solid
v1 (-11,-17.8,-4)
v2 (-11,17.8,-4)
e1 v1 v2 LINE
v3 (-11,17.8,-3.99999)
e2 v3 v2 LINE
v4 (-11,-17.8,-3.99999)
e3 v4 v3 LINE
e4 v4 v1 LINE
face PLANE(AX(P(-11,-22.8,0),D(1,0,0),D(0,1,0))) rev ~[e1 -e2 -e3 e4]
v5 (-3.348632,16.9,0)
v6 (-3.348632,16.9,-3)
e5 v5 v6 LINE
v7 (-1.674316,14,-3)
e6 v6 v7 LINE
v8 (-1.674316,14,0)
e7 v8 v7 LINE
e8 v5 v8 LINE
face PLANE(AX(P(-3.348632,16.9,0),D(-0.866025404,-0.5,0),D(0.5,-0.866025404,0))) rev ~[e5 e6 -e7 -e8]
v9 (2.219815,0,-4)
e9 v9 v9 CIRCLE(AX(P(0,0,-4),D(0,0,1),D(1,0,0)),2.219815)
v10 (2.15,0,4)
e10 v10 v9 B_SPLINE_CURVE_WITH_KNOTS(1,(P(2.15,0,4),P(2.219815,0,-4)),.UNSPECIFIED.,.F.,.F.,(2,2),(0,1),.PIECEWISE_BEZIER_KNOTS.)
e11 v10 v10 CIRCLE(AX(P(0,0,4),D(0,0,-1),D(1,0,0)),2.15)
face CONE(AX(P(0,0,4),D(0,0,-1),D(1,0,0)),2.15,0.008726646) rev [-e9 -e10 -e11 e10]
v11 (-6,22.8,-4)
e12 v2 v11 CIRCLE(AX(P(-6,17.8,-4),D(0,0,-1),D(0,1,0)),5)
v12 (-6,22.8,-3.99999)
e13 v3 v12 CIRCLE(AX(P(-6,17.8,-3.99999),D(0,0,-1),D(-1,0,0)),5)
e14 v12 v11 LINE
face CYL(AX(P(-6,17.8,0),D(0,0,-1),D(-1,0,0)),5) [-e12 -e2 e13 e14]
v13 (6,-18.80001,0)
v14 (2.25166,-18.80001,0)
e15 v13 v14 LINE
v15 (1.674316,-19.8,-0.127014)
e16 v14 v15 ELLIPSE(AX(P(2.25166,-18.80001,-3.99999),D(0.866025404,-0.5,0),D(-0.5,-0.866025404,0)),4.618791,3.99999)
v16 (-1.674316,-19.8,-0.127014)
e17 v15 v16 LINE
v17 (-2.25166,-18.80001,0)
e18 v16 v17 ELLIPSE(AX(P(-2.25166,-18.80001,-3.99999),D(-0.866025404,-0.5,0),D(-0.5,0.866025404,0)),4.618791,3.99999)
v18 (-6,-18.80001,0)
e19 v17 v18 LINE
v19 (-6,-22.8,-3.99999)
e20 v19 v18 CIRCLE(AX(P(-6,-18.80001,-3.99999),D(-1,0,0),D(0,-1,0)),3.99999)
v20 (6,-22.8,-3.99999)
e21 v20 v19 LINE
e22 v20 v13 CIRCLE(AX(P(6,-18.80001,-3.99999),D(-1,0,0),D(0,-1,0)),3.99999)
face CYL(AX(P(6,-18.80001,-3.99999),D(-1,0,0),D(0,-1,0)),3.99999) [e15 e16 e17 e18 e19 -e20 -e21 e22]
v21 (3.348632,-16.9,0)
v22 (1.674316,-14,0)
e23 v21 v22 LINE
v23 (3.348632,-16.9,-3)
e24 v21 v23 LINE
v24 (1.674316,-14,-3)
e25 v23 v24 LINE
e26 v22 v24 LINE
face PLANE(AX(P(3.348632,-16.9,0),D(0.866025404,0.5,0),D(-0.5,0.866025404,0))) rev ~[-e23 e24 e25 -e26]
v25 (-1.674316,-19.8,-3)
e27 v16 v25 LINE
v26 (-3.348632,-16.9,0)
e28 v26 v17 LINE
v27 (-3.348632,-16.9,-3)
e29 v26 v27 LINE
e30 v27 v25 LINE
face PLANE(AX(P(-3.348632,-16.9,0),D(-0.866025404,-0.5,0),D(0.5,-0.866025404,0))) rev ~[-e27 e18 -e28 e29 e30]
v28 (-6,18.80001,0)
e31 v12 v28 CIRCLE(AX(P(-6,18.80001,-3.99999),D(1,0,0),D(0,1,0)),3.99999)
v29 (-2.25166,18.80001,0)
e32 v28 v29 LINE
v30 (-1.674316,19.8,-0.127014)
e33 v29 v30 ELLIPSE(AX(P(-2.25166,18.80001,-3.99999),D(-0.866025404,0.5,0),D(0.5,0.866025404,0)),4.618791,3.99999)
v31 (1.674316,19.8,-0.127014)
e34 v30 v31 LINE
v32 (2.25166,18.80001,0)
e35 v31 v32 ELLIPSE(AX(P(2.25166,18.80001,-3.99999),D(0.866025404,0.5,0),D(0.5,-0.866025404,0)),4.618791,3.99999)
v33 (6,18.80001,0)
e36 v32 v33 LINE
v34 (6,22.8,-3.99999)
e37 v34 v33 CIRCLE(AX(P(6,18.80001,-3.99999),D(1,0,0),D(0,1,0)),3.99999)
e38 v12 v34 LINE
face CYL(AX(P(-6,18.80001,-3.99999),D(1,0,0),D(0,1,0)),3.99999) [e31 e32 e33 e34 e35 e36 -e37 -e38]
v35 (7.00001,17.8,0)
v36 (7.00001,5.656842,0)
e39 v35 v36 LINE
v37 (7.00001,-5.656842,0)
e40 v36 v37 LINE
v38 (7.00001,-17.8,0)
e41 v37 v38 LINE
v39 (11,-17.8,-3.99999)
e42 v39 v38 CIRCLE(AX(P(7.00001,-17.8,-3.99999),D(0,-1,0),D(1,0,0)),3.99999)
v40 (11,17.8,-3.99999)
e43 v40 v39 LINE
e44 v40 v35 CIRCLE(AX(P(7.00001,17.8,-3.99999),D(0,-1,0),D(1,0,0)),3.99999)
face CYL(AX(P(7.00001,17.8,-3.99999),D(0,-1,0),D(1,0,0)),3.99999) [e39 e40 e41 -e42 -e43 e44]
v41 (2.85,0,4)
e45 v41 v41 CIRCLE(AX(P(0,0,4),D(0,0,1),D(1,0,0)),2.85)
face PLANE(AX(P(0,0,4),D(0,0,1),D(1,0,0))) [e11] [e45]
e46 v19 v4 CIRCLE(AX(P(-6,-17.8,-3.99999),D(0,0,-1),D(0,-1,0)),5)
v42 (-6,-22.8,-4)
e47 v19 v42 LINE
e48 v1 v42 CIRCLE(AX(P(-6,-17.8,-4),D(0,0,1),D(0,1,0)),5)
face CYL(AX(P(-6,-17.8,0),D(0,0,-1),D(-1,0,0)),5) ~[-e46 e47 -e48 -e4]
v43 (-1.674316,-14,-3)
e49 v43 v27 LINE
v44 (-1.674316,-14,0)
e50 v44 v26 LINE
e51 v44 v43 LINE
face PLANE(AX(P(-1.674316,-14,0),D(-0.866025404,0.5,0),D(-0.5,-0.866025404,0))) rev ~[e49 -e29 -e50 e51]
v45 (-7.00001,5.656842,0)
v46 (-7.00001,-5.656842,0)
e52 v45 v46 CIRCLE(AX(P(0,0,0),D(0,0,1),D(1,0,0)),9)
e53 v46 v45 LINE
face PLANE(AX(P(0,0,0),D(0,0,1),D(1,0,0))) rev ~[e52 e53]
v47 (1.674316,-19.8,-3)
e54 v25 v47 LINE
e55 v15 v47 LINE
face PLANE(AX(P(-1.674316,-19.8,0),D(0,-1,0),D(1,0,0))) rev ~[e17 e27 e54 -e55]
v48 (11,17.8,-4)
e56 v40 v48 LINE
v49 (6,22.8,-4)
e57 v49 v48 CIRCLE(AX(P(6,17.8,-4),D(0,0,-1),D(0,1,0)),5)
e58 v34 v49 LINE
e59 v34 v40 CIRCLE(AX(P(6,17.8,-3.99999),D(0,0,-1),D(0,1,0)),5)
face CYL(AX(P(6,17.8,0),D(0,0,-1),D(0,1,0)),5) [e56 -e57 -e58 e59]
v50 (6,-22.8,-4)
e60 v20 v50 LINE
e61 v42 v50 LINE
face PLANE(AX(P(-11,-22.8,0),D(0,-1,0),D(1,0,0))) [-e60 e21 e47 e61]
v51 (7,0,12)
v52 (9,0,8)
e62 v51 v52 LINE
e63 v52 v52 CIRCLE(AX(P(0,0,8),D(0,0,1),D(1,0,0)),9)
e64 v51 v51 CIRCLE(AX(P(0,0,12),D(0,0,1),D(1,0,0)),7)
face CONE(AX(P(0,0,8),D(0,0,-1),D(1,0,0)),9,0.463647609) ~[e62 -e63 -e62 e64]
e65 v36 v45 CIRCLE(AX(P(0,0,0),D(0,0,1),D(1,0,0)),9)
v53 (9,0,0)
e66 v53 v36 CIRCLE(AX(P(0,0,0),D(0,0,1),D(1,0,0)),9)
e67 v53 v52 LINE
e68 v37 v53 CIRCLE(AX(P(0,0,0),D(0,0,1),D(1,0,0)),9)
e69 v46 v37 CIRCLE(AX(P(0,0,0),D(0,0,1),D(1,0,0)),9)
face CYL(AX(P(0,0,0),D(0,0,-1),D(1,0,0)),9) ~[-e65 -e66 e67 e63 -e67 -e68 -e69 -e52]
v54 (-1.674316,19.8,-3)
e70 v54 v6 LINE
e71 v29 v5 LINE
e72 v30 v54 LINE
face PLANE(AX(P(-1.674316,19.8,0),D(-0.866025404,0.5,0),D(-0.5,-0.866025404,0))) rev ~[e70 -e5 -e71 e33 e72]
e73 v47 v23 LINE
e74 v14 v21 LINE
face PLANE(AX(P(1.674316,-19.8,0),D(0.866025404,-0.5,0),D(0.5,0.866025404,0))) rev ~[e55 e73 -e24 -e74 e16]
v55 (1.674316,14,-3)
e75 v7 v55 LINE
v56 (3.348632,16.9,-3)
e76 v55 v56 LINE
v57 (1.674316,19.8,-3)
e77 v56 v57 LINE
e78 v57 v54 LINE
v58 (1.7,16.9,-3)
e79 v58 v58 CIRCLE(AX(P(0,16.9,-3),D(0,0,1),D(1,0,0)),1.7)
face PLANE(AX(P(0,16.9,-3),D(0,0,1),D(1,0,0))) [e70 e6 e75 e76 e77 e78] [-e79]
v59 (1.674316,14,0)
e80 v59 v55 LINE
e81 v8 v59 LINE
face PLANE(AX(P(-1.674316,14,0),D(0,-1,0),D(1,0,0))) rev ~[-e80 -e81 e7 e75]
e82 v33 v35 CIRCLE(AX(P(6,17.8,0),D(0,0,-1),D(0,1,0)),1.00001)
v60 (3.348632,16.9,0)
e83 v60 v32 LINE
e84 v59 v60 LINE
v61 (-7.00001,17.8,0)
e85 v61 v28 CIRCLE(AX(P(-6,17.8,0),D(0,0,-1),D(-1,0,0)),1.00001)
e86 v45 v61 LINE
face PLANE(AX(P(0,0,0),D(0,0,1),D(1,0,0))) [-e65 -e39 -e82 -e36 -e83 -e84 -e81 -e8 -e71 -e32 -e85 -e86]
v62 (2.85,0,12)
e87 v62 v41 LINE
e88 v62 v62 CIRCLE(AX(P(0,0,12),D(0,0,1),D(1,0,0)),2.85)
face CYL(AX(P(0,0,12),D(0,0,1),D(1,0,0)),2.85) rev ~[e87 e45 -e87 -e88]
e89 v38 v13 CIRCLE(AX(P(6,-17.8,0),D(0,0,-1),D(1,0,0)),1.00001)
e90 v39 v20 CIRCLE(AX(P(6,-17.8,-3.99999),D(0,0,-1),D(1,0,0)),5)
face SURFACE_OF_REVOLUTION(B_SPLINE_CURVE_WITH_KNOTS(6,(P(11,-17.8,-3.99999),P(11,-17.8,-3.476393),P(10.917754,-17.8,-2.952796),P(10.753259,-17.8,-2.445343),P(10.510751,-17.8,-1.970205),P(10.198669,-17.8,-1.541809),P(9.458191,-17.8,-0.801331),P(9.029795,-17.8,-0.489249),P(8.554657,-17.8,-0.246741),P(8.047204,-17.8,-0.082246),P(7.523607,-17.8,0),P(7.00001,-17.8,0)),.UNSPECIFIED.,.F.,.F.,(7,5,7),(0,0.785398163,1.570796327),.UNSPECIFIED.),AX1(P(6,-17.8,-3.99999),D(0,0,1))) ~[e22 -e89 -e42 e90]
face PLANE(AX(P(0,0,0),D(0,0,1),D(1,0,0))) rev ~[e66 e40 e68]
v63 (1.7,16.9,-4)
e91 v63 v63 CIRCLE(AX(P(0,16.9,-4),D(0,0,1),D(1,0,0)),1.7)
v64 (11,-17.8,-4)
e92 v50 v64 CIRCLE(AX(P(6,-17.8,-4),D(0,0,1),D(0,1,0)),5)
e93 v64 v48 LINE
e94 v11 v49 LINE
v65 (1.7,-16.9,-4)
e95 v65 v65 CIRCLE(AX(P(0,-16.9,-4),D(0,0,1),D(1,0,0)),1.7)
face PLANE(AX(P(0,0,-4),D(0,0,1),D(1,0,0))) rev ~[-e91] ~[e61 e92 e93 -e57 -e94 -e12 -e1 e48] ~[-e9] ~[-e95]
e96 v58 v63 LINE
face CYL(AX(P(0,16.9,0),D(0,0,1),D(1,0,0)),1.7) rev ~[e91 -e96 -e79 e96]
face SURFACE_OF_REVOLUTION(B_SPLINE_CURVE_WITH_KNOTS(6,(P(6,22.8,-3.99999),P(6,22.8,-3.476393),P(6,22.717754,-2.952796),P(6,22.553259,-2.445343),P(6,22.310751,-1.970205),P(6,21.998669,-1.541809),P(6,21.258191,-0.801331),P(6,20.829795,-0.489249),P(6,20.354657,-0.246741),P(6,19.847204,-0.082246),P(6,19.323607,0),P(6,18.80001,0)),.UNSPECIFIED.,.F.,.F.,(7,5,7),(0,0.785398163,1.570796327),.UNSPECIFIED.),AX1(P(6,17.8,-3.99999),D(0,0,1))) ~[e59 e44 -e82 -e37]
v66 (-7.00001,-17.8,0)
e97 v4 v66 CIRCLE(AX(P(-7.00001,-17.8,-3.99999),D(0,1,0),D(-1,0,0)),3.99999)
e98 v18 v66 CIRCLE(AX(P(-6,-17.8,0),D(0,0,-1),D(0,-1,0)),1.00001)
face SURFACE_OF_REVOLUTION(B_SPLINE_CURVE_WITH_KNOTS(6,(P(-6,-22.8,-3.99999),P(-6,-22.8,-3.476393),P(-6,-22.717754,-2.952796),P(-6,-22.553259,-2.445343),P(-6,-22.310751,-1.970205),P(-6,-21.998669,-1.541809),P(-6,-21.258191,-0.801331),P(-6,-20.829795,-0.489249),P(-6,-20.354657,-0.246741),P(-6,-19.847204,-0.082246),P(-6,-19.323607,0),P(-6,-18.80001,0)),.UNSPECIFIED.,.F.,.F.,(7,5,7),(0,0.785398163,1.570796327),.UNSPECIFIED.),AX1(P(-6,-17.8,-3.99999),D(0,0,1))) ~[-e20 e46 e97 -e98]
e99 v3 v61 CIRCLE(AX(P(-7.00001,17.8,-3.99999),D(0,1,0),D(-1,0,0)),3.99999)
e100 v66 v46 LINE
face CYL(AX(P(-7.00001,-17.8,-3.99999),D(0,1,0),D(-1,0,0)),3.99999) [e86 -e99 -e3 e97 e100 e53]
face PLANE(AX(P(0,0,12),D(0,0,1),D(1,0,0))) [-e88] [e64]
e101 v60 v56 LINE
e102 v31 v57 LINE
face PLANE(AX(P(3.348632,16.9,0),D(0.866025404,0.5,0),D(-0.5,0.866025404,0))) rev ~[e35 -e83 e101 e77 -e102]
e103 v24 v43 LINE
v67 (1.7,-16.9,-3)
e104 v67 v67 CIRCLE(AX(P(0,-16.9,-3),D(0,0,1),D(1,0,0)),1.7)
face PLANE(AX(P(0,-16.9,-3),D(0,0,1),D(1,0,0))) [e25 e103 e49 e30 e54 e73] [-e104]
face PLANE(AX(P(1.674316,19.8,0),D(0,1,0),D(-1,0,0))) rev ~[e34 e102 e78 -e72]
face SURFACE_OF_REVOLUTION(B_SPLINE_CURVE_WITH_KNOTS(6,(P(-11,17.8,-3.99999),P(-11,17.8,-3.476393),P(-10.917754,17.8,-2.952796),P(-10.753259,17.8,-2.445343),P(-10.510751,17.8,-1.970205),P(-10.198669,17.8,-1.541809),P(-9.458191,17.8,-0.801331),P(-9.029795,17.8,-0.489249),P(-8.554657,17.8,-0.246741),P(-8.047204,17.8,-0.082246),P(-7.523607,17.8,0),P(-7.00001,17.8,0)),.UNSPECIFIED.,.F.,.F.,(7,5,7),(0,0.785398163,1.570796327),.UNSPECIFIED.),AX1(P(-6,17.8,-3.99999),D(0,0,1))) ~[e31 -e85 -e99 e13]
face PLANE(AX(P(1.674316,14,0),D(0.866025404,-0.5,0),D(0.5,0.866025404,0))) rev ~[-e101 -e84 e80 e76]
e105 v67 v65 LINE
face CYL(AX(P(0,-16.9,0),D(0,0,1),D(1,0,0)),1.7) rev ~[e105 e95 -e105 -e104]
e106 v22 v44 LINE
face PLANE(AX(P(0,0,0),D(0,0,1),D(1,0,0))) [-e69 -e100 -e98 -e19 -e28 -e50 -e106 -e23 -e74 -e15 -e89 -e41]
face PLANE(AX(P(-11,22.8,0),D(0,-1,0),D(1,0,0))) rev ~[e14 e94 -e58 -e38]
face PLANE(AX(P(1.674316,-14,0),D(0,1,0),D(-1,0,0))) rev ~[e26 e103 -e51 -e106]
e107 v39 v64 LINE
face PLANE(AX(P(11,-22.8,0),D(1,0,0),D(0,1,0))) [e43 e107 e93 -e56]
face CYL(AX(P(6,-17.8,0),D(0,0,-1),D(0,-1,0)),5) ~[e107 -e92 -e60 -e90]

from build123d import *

# Parameters (mm, degrees)
F2_W      = 22
F2_H      = 45.6
F2_R      = 1.7
F3_DEPTH  = 4
F4_R      = 5
F5_R      = 3.99999
F6_DEPTH  = 3
F8_R      = 9
F9_DEPTH  = 12
F10_R     = 2.85
F11_DEPTH = 8
F12_R     = 2.15
F13_DEPTH = 8
F13_TAPER = -0.5
F14_SIZE2 = 4
F14_SIZE  = 2


# Not quite as in the source:
# - a fillet or chamfer is up to 0.001 mm smaller than in the source, because OpenCascade refuses the exact size
# - a feature names something its author has since deleted; it is built from what else it names


with BuildPart() as f3:
    # F2 (on Top) → F3 (new body)
    with BuildSketch(Plane.XY):
        Rectangle(F2_W, F2_H)
        Polygon((3.3486315613, -16.9), (1.6743157806, -19.8), (-1.6743157806, -19.8), (-3.3486315613, -16.9), (-1.6743157806, -14), (1.6743157806, -14), align=None, mode=Mode.SUBTRACT)
        Circle(F2_R, mode=Mode.SUBTRACT)
        Polygon((1.6743157806, 19.8), (3.3486315613, 16.9), (1.6743157806, 14), (-1.6743157806, 14), (-3.3486315613, 16.9), (-1.6743157806, 19.8), align=None, mode=Mode.SUBTRACT)
        Polygon((1.6743157806, 14), (3.3486315613, 16.9), (1.6743157806, 19.8), (-1.6743157806, 19.8), (-3.3486315613, 16.9), (-1.6743157806, 14), align=None)
        with Locations((0, 16.9)):
            Circle(F2_R, mode=Mode.SUBTRACT)
        Circle(F2_R)
        Polygon((-1.6743157806, -19.8), (1.6743157806, -19.8), (3.3486315613, -16.9), (1.6743157806, -14), (-1.6743157806, -14), (-3.3486315613, -16.9), align=None)
        with Locations((0, -16.9)):
            Circle(F2_R, mode=Mode.SUBTRACT)
    extrude(amount=-F3_DEPTH)

    # F4
    f4_edges = [f3.edges().sort_by_distance(p)[0] for p in [
        (-11, 22.8, -2),
        (11, 22.8, -2),
        (11, -22.8, -2),
        (-11, -22.8, -2),
    ]]
    fillet(f4_edges, radius=F4_R)

    # F5 (radius 4 in the source; OpenCascade refuses exactly that, so slightly less here)
    f5_edges = [f3.edges().sort_by_distance(p)[0] for p in [
        (-11, 0, 0),
        (0, -22.8, 0),
        (-9.535534, -21.335534, 0),
        (9.535534, -21.335534, 0),
        (11, 0, 0),
        (9.535534, 21.335534, 0),
        (0, 22.8, 0),
        (-9.535534, 21.335534, 0),
    ]]
    fillet(f5_edges, radius=F5_R)

    # F2 (on Top) → F6 (cut)
    with BuildSketch(Plane.XY):
        Polygon((1.6743157806, 14), (3.3486315613, 16.9), (1.6743157806, 19.8), (-1.6743157806, 19.8), (-3.3486315613, 16.9), (-1.6743157806, 14), align=None)
        with Locations((0, 16.9)):
            Circle(F2_R, mode=Mode.SUBTRACT)
        Polygon((-1.6743157806, -19.8), (1.6743157806, -19.8), (3.3486315613, -16.9), (1.6743157806, -14), (-1.6743157806, -14), (-3.3486315613, -16.9), align=None)
        with Locations((0, -16.9)):
            Circle(F2_R, mode=Mode.SUBTRACT)
    extrude(amount=-F6_DEPTH, mode=Mode.SUBTRACT)

    # F8 (on line) → F9 (join)
    with BuildSketch(Plane.XY):
        Circle(F8_R)
    extrude(amount=F9_DEPTH)

    # F10 (on face) → F11 (cut)
    with BuildSketch(Plane.XY.offset(12)):
        Circle(F10_R)
    extrude(amount=-F11_DEPTH, mode=Mode.SUBTRACT)

    # F12 (on face) → F13 (cut, through all)
    with BuildSketch(Plane.XY.offset(4)):
        Circle(F12_R)
    extrude(amount=-F13_DEPTH, taper=F13_TAPER, mode=Mode.SUBTRACT)

    # F14
    f14_edges = [f3.edges().sort_by_distance(p)[0] for p in [
        (-9, 0, 12),
    ]]
    f14_side = f3.faces().sort_by_distance((-8.745442, 0, 12))[0]
    chamfer(f14_edges, length=F14_SIZE, length2=F14_SIZE2, reference=f14_side)


solid = f3.part
